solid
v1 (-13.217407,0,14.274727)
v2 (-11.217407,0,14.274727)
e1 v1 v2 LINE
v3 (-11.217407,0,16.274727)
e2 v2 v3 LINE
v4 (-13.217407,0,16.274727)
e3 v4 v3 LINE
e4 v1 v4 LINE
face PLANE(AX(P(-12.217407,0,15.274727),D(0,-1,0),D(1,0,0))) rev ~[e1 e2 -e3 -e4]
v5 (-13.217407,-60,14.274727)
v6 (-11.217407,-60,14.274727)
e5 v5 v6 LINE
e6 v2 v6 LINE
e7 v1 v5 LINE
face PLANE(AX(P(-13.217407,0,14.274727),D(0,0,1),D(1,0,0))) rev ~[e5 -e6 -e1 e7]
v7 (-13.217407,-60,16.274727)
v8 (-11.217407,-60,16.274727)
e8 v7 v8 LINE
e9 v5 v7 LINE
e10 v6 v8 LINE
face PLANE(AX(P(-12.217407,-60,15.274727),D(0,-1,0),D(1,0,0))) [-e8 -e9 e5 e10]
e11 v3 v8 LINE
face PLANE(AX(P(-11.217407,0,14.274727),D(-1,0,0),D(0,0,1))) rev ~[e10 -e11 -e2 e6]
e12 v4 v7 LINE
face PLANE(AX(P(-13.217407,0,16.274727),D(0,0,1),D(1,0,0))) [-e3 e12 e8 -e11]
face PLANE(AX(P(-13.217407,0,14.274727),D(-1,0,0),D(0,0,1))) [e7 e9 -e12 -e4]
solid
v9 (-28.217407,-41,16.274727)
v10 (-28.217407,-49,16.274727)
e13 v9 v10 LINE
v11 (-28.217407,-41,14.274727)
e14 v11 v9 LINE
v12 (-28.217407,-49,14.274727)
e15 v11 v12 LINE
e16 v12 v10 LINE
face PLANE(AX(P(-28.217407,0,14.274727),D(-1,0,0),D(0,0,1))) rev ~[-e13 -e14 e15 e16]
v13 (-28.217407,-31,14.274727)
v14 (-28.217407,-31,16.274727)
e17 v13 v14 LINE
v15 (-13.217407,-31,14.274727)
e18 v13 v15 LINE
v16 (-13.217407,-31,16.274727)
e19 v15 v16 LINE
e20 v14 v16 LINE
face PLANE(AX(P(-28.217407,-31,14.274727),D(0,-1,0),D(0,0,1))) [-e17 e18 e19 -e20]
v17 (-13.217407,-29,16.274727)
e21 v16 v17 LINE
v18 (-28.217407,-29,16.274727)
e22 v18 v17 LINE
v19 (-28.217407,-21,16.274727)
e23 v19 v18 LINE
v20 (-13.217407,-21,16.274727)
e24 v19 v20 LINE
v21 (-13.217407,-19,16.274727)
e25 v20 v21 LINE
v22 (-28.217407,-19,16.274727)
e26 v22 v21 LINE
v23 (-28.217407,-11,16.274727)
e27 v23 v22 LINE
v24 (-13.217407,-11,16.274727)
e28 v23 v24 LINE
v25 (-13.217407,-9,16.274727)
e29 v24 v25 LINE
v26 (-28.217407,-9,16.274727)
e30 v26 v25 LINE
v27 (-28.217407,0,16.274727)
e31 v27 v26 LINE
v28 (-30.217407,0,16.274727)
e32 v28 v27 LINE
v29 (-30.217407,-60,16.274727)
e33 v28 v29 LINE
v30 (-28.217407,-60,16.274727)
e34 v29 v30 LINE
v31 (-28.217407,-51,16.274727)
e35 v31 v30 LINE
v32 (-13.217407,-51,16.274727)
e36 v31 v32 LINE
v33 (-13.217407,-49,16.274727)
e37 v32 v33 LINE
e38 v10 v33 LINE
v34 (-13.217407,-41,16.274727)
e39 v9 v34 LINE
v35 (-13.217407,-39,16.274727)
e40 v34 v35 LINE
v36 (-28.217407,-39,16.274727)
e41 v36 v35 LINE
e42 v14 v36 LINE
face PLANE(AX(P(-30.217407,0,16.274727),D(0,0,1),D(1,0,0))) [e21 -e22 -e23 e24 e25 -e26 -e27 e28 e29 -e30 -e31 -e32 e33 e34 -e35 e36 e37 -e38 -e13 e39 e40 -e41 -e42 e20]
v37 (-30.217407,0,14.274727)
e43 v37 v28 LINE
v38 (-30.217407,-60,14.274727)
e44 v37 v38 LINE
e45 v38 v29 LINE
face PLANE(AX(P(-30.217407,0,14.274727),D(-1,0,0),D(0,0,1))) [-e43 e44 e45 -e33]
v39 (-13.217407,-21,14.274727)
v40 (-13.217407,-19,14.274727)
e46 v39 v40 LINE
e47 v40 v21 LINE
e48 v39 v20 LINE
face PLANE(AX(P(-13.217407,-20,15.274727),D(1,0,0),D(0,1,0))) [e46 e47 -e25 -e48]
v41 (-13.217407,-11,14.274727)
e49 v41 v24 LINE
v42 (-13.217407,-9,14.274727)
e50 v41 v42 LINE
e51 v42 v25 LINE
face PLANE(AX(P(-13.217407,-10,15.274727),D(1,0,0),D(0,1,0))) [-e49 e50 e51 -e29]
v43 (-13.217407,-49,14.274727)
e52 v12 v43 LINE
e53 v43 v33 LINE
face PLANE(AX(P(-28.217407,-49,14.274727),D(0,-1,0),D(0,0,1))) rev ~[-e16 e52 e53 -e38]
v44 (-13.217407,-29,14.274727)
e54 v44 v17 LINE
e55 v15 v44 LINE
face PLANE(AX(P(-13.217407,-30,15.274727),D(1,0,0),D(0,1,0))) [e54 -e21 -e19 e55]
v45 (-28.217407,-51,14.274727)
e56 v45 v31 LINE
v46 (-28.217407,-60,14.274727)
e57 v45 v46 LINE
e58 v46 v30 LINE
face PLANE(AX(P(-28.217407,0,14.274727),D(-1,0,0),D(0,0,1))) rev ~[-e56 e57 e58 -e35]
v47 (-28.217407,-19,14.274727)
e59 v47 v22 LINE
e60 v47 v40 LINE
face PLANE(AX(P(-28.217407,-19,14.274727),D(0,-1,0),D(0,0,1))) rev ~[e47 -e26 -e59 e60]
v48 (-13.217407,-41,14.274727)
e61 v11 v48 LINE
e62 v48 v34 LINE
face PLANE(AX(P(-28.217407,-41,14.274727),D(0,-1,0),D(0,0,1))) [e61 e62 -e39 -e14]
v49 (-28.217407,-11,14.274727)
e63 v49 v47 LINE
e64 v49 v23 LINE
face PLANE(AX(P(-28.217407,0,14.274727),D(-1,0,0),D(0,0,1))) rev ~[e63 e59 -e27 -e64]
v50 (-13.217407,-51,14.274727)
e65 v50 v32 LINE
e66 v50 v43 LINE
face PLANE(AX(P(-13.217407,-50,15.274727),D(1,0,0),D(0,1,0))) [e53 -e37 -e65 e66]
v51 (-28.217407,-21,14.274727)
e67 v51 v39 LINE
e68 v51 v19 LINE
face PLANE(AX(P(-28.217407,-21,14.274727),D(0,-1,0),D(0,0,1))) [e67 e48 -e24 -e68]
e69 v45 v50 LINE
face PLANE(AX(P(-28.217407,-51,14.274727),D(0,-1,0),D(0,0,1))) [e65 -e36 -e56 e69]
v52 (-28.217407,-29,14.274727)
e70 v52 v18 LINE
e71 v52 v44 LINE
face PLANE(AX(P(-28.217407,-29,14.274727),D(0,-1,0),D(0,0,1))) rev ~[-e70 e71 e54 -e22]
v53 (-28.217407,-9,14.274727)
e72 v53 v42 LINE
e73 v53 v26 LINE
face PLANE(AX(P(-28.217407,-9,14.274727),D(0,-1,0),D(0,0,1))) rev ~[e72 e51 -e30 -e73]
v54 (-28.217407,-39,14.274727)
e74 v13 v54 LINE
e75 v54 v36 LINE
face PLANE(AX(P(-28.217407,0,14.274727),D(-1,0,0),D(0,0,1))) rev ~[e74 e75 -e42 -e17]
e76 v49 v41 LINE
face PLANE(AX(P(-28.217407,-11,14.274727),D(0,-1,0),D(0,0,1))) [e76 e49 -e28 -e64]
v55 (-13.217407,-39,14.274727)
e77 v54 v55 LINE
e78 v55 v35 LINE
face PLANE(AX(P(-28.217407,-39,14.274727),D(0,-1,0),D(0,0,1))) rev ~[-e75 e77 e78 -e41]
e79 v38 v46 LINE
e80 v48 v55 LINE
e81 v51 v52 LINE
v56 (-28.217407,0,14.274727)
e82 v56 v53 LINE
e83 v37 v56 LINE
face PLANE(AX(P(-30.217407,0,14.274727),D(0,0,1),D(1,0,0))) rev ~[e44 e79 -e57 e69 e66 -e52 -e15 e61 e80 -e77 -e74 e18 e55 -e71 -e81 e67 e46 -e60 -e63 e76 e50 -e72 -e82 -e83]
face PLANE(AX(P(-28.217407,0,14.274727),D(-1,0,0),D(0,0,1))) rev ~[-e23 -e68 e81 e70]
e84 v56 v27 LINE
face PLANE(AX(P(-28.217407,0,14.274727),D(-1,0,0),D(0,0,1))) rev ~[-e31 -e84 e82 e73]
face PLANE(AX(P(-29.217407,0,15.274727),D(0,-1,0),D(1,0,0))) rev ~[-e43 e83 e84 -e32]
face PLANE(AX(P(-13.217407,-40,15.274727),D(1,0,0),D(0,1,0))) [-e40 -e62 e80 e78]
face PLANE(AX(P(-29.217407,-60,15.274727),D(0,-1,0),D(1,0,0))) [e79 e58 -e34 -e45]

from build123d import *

# Parameters (mm, degrees)
F0_W     = 2
F0_H     = 2
F1_DEPTH = 60
F2_W     = 2
F2_H     = 2
F3_DEPTH = 15


with BuildPart() as f1:
    # F0 (on Front) → F1 (new body)
    with BuildSketch(Plane.XZ):
        with Locations((-29.2174071148, 15.274727294)):
            Rectangle(F0_W, F0_H)
    extrude(amount=F1_DEPTH)

    # F2 (on face) → F3 (join)
    with BuildSketch(Plane.YZ.offset(-28.2174071148)):
        with Locations((-50, 15.274727294)):
            Rectangle(F2_W, F2_H)
        with Locations((-40, 15.274727294)):
            Rectangle(F2_W, F2_H)
        with Locations((-30, 15.274727294)):
            Rectangle(F2_W, F2_H)
        with Locations((-20, 15.274727294)):
            Rectangle(F2_W, F2_H)
        with Locations((-10, 15.274727294)):
            Rectangle(F2_W, F2_H)
    extrude(amount=F3_DEPTH)


with BuildPart() as f1b:
    # F0 (on Front) → F1, piece 2 (new body)
    with BuildSketch(Plane.XZ):
        with Locations((-12.2174071148, 15.274727294)):
            Rectangle(F0_W, F0_H)
    extrude(amount=F1_DEPTH)


solid = Compound([f1.part, f1b.part])
